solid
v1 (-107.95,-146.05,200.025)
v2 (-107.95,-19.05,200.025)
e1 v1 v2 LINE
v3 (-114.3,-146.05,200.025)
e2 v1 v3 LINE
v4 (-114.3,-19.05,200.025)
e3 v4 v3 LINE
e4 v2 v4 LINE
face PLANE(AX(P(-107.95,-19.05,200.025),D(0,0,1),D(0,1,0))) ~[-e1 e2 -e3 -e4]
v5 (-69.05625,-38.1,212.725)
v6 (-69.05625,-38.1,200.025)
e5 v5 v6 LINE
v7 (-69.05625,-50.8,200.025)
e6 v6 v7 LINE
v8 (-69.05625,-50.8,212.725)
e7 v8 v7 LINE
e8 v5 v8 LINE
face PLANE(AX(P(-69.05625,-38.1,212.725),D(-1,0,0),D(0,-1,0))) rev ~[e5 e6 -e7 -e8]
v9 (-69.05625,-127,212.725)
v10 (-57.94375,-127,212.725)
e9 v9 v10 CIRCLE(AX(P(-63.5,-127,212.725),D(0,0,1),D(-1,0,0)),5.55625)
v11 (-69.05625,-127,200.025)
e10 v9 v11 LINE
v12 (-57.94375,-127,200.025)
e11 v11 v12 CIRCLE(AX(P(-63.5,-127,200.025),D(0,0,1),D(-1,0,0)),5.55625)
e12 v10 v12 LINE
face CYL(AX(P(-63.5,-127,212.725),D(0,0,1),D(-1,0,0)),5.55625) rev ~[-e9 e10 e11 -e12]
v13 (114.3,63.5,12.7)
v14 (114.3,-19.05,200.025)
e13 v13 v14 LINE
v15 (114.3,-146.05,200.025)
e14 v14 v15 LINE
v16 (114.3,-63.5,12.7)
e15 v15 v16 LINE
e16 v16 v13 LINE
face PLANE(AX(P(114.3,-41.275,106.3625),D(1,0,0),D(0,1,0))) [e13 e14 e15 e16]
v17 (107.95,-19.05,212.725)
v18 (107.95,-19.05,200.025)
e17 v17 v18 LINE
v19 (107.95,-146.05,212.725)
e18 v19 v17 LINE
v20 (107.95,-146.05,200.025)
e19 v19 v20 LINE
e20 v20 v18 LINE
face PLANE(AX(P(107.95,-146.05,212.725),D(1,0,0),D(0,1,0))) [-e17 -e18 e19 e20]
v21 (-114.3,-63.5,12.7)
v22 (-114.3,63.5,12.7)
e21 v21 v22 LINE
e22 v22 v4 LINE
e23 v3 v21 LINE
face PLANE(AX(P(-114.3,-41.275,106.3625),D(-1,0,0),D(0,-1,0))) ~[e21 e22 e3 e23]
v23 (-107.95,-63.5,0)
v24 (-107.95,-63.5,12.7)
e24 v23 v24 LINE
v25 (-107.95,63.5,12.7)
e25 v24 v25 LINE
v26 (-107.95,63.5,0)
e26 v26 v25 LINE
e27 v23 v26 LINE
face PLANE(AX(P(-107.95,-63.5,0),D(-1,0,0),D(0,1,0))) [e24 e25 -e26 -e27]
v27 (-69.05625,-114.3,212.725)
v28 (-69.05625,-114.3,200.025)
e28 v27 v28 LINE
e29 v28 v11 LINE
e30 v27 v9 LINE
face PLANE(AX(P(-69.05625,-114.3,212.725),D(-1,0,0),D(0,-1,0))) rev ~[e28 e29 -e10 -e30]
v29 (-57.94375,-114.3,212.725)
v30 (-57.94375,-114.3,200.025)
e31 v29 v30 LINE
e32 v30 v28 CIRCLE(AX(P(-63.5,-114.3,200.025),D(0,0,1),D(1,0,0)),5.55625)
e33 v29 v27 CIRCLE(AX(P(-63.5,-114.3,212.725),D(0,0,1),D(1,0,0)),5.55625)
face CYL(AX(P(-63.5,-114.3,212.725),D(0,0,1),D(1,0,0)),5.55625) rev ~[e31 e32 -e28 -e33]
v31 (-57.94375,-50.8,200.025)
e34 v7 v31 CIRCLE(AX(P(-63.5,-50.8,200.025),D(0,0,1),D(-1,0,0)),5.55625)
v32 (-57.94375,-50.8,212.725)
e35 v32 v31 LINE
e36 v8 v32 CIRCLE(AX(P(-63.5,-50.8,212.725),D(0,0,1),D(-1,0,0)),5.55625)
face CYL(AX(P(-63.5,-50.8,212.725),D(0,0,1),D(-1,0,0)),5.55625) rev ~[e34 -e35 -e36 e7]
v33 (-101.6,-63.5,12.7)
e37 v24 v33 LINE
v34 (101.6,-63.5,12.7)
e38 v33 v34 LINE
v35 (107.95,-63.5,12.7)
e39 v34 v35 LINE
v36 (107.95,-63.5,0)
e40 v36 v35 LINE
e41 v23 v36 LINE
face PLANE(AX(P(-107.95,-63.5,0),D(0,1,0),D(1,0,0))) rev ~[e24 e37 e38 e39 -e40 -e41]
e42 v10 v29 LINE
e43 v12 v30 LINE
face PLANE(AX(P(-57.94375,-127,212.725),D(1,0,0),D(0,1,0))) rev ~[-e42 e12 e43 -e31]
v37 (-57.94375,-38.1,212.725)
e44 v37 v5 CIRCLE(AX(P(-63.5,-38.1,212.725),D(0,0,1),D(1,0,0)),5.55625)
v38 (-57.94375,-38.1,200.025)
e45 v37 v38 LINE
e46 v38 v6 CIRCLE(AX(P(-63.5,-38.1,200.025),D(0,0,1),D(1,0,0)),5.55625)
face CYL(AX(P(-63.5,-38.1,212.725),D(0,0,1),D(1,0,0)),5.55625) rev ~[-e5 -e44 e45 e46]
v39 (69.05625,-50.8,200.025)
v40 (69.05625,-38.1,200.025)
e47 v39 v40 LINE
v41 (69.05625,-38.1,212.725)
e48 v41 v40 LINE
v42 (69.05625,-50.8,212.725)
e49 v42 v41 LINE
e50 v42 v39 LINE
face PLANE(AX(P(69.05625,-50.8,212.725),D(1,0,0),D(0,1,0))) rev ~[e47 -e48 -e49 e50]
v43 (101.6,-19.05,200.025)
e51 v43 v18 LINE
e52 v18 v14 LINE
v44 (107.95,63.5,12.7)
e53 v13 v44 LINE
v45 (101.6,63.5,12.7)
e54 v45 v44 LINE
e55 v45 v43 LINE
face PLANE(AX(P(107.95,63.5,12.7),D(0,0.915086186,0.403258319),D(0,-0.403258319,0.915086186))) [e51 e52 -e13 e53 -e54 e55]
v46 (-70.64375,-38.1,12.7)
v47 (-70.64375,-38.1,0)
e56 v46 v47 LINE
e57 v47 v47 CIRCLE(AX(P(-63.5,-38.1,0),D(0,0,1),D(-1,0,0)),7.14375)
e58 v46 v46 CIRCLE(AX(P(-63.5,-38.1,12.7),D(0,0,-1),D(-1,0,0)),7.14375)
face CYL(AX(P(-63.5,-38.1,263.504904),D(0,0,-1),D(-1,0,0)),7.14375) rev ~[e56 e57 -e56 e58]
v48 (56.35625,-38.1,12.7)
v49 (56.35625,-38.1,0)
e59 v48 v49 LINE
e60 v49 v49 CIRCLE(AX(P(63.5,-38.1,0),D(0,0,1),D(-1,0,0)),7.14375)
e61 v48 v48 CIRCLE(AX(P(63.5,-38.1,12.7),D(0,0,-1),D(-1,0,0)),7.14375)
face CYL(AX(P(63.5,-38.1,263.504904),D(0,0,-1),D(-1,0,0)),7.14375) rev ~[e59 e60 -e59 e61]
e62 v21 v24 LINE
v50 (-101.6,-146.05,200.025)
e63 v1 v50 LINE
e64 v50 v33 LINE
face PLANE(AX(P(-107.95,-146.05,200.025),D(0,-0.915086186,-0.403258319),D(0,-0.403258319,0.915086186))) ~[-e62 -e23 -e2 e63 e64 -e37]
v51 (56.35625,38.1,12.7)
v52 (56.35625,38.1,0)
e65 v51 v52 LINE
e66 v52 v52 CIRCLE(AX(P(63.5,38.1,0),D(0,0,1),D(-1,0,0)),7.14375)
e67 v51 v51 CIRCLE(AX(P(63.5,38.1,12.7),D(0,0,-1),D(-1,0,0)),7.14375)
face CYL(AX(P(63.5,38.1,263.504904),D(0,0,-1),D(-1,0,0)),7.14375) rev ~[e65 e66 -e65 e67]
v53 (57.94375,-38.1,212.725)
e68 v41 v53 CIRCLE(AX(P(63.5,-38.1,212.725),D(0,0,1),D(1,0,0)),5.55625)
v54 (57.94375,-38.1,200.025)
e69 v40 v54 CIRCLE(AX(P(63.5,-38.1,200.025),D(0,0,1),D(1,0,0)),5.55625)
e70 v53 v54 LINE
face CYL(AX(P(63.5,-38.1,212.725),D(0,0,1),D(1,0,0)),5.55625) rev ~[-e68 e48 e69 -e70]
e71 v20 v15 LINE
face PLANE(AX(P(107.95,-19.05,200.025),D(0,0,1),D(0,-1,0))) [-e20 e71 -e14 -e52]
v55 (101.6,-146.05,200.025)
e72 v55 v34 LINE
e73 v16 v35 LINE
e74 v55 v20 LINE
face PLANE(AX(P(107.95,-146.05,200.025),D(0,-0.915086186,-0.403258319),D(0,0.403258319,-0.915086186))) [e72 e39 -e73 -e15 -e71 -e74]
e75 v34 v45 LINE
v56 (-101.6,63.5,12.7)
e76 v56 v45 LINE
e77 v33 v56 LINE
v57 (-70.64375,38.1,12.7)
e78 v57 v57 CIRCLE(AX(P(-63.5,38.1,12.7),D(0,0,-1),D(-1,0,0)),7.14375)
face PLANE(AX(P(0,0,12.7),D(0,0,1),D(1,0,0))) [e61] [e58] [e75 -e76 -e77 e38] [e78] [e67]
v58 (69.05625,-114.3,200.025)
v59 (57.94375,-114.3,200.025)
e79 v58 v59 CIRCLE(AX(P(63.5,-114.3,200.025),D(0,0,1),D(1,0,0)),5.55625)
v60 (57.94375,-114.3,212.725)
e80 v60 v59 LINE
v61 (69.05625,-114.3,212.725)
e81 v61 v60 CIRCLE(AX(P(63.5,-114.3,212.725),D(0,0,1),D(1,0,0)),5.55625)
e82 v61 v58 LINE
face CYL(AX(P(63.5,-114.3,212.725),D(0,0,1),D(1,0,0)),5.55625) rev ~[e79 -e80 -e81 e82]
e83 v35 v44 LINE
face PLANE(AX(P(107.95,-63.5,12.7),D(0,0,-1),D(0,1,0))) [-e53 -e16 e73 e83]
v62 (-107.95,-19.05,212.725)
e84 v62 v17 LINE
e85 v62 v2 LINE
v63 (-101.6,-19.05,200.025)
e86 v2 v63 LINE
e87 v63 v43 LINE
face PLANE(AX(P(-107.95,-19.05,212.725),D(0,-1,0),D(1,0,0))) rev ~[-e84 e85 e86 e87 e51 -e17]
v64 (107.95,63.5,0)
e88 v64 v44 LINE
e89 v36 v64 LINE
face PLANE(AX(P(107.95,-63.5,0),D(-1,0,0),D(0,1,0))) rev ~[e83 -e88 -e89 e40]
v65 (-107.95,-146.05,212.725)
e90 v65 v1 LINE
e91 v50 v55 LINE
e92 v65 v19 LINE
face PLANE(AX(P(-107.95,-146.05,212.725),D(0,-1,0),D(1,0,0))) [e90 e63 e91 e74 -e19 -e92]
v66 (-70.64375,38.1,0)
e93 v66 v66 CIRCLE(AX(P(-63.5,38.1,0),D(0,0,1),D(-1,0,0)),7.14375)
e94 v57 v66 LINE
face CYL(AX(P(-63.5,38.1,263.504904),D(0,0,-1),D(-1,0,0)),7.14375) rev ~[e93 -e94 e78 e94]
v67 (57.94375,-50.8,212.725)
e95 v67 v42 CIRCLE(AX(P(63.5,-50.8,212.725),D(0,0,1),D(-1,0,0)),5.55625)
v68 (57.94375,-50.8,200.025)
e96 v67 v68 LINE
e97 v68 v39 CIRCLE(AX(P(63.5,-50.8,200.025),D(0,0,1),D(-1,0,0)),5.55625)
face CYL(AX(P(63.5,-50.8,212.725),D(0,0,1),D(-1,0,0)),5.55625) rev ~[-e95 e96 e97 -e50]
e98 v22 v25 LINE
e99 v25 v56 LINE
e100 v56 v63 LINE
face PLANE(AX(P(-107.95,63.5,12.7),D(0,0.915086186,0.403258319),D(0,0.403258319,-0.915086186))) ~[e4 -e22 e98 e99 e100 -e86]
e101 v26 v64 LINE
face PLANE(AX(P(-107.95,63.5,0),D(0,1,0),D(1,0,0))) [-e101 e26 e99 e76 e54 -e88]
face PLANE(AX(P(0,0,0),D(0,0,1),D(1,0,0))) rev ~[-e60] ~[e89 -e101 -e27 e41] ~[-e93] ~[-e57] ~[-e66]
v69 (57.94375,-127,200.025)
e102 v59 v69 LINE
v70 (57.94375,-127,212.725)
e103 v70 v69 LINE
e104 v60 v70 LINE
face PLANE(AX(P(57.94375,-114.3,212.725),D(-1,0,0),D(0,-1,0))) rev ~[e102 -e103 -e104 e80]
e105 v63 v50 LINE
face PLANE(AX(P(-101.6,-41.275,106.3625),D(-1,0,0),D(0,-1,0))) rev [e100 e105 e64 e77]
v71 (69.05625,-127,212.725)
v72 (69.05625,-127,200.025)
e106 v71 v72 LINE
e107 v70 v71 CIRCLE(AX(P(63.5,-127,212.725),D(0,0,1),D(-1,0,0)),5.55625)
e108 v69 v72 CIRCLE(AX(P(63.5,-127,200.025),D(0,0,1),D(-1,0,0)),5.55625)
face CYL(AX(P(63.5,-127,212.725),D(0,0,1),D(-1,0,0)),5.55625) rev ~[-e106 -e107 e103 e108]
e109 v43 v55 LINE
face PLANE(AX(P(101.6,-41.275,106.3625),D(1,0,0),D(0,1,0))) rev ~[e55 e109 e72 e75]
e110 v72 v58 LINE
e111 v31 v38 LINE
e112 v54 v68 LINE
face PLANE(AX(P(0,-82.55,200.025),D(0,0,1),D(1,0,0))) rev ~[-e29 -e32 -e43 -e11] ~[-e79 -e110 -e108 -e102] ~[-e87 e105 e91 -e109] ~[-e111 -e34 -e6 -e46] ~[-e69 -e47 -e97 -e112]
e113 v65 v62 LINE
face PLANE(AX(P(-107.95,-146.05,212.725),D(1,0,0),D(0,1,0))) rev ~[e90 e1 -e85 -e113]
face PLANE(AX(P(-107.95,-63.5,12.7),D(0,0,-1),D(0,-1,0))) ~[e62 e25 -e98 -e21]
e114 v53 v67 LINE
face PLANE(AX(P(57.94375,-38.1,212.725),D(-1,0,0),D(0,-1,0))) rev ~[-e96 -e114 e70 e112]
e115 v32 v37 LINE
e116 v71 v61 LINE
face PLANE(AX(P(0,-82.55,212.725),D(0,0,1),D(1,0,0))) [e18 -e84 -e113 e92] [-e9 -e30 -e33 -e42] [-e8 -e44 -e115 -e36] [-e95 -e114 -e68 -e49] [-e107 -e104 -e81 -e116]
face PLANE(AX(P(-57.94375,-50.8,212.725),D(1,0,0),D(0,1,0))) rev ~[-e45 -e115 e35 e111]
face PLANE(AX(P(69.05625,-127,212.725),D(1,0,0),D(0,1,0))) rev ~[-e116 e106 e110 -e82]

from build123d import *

# Parameters (mm, degrees)
F0_W      = 215.9
F0_H      = 127
F1_DEPTH  = 12.7
F3_D      = 14.2875
F5_W      = 215.9
F5_H      = 127
F6_DEPTH  = 12.7
F8_DEPTH  = 212.726
F10_DEPTH = 6.35


# Not quite as in the source:
# - a length typed as a fraction of an inch, garbled in the dataset ("3 / 203.2 mm" for 3/8 in), is restored


with BuildPart() as f1:
    # F0 (on Top) → F1 (new body)
    with BuildSketch(Plane.XY):
        Rectangle(F0_W, F0_H)
    extrude(amount=F1_DEPTH)

    # F3 (through all)
    with Locations(Plane.XY.offset(12.7)):
        with Locations((-63.5, 38.1), (63.5, 38.1), (63.5, -38.1), (-63.5, -38.1)):
            Hole(F3_D / 2)



with BuildPart() as f6:
    # F5 (on offset) → F6 (new body)
    with BuildSketch(Plane.XY.offset(212.725)):
        with Locations((0, -82.55)):
            Rectangle(F5_W, F5_H)
    extrude(amount=-F6_DEPTH)

    # F7 (on face) → F8 (cut, through all)
    with BuildSketch(Plane.XY.offset(212.725)):
        with BuildLine():
            ThreePointArc((-57.94375, -38.1), (-63.5, -32.54375), (-69.05625, -38.1))
            Line((-69.05625, -38.1), (-69.05625, -50.8))
            ThreePointArc((-69.05625, -50.8), (-63.5, -56.35625), (-57.94375, -50.8))
            Line((-57.94375, -50.8), (-57.94375, -38.1))
        make_face()
        with BuildLine():
            ThreePointArc((-57.94375, -114.3), (-63.5, -108.74375), (-69.05625, -114.3))
            Line((-69.05625, -114.3), (-69.05625, -127))
            ThreePointArc((-69.05625, -127), (-63.5, -132.55625), (-57.94375, -127))
            Line((-57.94375, -127), (-57.94375, -114.3))
        make_face()
        with BuildLine():
            ThreePointArc((69.05625, -38.1), (63.5, -32.54375), (57.94375, -38.1))
            Line((57.94375, -38.1), (57.94375, -50.8))
            ThreePointArc((57.94375, -50.8), (63.5, -56.35625), (69.05625, -50.8))
            Line((69.05625, -50.8), (69.05625, -38.1))
        make_face()
        with BuildLine():
            ThreePointArc((69.05625, -114.3), (63.5, -108.74375), (57.94375, -114.3))
            Line((57.94375, -114.3), (57.94375, -127))
            ThreePointArc((57.94375, -127), (63.5, -132.55625), (69.05625, -127))
            Line((69.05625, -127), (69.05625, -114.3))
        make_face()
    extrude(amount=-F8_DEPTH, mode=Mode.SUBTRACT)


with BuildPart() as f1_1:
    add(f1.part)

    add(f6.part)  # F10 merges F6
    # F9 (on face) → F10 (join, symmetric)
    with BuildSketch(Plane.YZ.offset(107.95)):
        Polygon((63.5, 12.7), (-19.05, 200.025), (-146.05, 200.025), (-63.5, 12.7), align=None)
    extrude(amount=F10_DEPTH, both=True)

    # F11: F1 across plane


with BuildPart() as f1_2:
    add(f1_1.part)
    add(f1_1.part.mirror(Plane.YZ))


solid = f1_2.part
